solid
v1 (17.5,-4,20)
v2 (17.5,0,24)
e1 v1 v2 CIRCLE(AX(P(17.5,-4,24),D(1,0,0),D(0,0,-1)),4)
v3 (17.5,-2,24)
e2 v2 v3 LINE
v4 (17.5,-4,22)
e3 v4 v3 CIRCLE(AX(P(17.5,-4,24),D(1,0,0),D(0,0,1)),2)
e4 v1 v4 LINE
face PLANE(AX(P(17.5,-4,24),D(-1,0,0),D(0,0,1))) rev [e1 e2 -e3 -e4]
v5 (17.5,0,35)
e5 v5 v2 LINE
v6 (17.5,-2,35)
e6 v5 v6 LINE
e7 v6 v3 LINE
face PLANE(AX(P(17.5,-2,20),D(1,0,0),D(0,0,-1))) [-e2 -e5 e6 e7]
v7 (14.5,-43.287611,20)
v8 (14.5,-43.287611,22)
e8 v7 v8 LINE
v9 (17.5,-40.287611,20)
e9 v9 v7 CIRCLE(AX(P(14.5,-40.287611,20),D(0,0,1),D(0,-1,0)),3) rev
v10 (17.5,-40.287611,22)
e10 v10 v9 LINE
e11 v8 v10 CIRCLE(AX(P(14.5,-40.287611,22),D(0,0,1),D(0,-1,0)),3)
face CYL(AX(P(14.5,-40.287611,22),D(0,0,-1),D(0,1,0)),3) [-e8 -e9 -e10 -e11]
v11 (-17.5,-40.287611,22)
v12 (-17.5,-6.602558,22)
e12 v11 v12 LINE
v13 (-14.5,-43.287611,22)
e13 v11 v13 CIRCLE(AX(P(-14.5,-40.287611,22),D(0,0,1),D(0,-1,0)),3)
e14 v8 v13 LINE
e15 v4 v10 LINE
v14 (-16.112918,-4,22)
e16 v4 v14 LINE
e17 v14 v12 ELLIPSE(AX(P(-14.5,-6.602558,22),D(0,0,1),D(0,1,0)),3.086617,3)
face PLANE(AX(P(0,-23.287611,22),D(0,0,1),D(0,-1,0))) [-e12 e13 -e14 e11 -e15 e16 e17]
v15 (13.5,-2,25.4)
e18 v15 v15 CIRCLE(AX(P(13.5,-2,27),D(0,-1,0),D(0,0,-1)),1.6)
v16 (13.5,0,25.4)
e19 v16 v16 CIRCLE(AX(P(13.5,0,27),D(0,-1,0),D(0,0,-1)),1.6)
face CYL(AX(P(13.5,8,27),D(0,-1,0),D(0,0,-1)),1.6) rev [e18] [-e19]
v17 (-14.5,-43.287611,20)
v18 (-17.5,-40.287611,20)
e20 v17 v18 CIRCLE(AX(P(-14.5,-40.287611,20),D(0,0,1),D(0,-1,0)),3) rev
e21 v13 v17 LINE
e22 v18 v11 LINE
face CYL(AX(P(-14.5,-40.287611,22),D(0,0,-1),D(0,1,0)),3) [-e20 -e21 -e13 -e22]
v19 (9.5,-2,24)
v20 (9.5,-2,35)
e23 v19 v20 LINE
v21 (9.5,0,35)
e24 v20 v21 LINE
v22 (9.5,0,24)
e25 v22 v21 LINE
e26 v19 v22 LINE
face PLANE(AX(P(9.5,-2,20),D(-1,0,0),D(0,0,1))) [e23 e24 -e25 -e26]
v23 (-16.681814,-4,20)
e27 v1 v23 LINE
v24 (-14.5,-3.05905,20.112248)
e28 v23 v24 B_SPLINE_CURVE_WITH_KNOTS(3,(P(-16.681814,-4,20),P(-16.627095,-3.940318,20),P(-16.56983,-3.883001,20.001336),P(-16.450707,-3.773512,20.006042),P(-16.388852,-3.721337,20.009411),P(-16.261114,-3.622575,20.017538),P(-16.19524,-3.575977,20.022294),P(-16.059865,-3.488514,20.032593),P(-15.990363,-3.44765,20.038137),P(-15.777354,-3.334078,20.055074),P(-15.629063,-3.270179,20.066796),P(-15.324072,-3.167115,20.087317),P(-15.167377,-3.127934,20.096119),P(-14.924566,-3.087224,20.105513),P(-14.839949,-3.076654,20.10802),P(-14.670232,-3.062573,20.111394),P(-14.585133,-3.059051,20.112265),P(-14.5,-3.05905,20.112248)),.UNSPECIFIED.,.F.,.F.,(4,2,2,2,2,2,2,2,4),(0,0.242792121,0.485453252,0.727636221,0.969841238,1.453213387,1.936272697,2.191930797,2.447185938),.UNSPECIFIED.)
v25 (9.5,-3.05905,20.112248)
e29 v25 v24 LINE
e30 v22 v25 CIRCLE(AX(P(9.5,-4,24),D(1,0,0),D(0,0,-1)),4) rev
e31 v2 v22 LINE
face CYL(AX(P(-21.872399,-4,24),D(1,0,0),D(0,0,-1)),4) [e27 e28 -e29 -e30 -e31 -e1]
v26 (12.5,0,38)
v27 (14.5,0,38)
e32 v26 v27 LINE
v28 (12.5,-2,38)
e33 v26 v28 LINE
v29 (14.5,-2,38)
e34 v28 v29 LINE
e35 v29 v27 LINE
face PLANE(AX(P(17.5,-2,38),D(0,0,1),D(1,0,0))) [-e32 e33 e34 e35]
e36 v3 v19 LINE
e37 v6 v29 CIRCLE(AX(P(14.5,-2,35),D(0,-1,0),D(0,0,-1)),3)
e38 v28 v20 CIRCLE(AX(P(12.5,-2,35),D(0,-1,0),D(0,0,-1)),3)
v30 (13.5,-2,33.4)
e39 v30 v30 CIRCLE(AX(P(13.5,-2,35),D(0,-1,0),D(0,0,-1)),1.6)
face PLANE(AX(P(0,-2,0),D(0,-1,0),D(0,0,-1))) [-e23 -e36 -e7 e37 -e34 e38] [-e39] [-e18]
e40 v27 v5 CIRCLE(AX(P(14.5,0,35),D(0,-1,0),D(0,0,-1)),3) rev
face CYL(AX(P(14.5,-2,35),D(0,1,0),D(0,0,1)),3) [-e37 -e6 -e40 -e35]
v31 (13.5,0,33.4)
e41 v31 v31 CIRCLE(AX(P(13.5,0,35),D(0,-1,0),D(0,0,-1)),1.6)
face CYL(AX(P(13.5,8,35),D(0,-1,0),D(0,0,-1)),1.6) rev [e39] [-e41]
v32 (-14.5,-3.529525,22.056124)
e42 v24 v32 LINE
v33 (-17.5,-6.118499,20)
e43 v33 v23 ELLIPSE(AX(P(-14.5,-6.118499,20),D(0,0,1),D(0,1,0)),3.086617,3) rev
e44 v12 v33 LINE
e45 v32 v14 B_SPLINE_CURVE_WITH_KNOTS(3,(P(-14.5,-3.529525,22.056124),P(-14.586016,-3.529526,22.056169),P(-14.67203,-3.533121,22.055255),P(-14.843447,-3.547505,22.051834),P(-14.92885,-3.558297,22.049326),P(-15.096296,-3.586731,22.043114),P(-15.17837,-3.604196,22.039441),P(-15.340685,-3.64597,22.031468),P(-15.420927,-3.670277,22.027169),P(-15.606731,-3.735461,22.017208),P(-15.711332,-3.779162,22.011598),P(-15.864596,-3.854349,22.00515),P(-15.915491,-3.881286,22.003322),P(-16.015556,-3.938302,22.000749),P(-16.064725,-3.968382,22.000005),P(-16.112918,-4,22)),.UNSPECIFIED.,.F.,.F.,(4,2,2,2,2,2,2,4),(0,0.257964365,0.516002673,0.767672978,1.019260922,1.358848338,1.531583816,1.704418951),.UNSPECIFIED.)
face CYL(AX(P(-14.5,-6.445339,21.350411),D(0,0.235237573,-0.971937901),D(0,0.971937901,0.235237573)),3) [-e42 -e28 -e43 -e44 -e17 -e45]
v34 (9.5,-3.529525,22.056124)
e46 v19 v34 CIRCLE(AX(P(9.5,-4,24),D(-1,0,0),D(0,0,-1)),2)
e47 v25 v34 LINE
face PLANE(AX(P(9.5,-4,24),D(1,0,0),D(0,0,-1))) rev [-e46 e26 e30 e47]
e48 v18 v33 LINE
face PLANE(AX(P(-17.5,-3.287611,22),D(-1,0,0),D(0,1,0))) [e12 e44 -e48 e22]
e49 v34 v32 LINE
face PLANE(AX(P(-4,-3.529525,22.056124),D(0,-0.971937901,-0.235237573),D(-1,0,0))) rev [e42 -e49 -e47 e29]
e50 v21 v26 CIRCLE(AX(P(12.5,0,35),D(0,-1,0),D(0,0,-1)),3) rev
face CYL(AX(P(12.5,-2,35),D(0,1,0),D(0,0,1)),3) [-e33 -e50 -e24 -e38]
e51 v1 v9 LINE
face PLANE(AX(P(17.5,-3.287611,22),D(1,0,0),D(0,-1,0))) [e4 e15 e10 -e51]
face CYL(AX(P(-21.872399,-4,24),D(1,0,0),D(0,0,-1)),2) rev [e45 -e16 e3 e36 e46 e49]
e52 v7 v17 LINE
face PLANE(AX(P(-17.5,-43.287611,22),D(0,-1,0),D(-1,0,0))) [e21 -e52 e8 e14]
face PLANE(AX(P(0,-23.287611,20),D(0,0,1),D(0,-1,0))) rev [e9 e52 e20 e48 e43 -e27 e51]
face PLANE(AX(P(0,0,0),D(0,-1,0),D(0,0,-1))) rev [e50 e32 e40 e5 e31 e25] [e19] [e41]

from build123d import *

# Parameters (mm, degrees)
SM_BASE_FLANGE_1_DEPTH = 2
OTHER_START            = -17.5
OTHER_1_DEPTH          = 35
OTHER_1_2_DEPTH        = 35
OTHER_START_2          = 9.5
OTHER_1_3_DEPTH        = 8
CUT_EXTRUDE_1_DEPTH    = 10
FILLET_1_R             = 3


# Read off the part's stored shape, not the designer's step: 绘制的折弯1
# Sheet-metal steps are written as plain solids
with BuildPart() as part:
    # Sketch 1 → 基体-法兰1 (new body)
    with BuildSketch(Plane(origin=(0, 0, 0), x_dir=(1, 0, 0), z_dir=(0, 1, 0))):
        Polygon((-17.5, -20), (9.5, -20), (9.5, -38), (17.5, -38), (17.5, -20), (17.5, 20), (-17.5, 20), align=None)
    extrude(amount=-SM_BASE_FLANGE_1_DEPTH)

    # Other 1 outline → Other 1 (cut)
    with BuildSketch(Plane.YZ.offset(OTHER_START)):
        with BuildLine():
            ThreePointArc((0, 24), (-0.535898385, 22), (-2, 20.535898384))
            Line((-2, 20.535898384), (-2, -20))
            Line((-2, -20), (0, -20))
            Line((0, -20), (0, 24))
        make_face()
    extrude(amount=OTHER_1_DEPTH, mode=Mode.SUBTRACT)



with BuildPart() as body_2:
    # Other 1 2 outline → Other 1 2 (new body)
    with BuildSketch(Plane.YZ.offset(OTHER_START)):
        with BuildLine():
            ThreePointArc((-3.529524853, 22.056124198), (-3.763094539, 22.014080615), (-4, 22))
            Line((-4, 22), (-43.28761102, 22))
            Line((-43.28761102, 22), (-43.28761102, 20))
            Line((-43.28761102, 20), (-4, 20))
            ThreePointArc((-4, 20), (-3.526189079, 20.02816123), (-3.059049707, 20.112248394))
            Line((-3.059049707, 20.112248394), (-3.529524853, 22.056124198))
        make_face()
    extrude(amount=OTHER_1_2_DEPTH)


with BuildPart() as part_1:
    add(part.part)

    add(body_2.part)  # Other 1 3 merges body 2
    # Other 1 3 outline → Other 1 3 (add)
    with BuildSketch(Plane.YZ.offset(OTHER_START_2)):
        with BuildLine():
            ThreePointArc((-2, 24), (-2.428225479, 22.763260394), (-3.529524853, 22.056124198))
            Line((-3.529524853, 22.056124198), (-3.059049707, 20.112248394))
            ThreePointArc((-3.059049707, 20.112248394), (-2.514346277, 20.286129645), (-2, 20.535898384))
            Line((-2, 20.535898384), (-2, 24))
        make_face()
    extrude(amount=OTHER_1_3_DEPTH)

    # 草图7 → 切除-拉伸1 (cut)
    with BuildSketch(Plane.XZ.offset(2)):
        with BuildLine():
            ThreePointArc((15.1, 35), (14.63137085, 36.13137085), (13.5, 36.6))
            Line((13.5, 36.6), (13.5, 35))
            Line((13.5, 35), (13.5, 33.4))
            ThreePointArc((13.5, 33.4), (14.63137085, 33.86862915), (15.1, 35))
        make_face()
        with BuildLine():
            Line((13.5, 35), (13.5, 36.6))
            ThreePointArc((13.5, 36.6), (11.9, 35), (13.5, 33.4))
            Line((13.5, 33.4), (13.5, 35))
        make_face()
        with BuildLine():
            ThreePointArc((15.1, 27), (14.63137085, 28.13137085), (13.5, 28.6))
            Line((13.5, 28.6), (13.5, 27))
            Line((13.5, 27), (13.5, 25.4))
            ThreePointArc((13.5, 25.4), (14.63137085, 25.86862915), (15.1, 27))
        make_face()
        with BuildLine():
            Line((13.5, 27), (13.5, 28.6))
            ThreePointArc((13.5, 28.6), (11.9, 27), (13.5, 25.4))
            Line((13.5, 25.4), (13.5, 27))
        make_face()
    extrude(amount=-CUT_EXTRUDE_1_DEPTH, mode=Mode.SUBTRACT)

    # 圆角1
    fillet_1_edges = [part_1.edges().sort_by_distance(p)[0] for p in [
        (-17.5, -43.28761102, 21),
        (17.5, -43.28761102, 21),
        (17.5, -1, 38),
        (9.5, -1, 38),
        (-17.5, -3.29428728, 21.084186296),
    ]]
    fillet(fillet_1_edges, radius=FILLET_1_R)


solid = part_1.part
